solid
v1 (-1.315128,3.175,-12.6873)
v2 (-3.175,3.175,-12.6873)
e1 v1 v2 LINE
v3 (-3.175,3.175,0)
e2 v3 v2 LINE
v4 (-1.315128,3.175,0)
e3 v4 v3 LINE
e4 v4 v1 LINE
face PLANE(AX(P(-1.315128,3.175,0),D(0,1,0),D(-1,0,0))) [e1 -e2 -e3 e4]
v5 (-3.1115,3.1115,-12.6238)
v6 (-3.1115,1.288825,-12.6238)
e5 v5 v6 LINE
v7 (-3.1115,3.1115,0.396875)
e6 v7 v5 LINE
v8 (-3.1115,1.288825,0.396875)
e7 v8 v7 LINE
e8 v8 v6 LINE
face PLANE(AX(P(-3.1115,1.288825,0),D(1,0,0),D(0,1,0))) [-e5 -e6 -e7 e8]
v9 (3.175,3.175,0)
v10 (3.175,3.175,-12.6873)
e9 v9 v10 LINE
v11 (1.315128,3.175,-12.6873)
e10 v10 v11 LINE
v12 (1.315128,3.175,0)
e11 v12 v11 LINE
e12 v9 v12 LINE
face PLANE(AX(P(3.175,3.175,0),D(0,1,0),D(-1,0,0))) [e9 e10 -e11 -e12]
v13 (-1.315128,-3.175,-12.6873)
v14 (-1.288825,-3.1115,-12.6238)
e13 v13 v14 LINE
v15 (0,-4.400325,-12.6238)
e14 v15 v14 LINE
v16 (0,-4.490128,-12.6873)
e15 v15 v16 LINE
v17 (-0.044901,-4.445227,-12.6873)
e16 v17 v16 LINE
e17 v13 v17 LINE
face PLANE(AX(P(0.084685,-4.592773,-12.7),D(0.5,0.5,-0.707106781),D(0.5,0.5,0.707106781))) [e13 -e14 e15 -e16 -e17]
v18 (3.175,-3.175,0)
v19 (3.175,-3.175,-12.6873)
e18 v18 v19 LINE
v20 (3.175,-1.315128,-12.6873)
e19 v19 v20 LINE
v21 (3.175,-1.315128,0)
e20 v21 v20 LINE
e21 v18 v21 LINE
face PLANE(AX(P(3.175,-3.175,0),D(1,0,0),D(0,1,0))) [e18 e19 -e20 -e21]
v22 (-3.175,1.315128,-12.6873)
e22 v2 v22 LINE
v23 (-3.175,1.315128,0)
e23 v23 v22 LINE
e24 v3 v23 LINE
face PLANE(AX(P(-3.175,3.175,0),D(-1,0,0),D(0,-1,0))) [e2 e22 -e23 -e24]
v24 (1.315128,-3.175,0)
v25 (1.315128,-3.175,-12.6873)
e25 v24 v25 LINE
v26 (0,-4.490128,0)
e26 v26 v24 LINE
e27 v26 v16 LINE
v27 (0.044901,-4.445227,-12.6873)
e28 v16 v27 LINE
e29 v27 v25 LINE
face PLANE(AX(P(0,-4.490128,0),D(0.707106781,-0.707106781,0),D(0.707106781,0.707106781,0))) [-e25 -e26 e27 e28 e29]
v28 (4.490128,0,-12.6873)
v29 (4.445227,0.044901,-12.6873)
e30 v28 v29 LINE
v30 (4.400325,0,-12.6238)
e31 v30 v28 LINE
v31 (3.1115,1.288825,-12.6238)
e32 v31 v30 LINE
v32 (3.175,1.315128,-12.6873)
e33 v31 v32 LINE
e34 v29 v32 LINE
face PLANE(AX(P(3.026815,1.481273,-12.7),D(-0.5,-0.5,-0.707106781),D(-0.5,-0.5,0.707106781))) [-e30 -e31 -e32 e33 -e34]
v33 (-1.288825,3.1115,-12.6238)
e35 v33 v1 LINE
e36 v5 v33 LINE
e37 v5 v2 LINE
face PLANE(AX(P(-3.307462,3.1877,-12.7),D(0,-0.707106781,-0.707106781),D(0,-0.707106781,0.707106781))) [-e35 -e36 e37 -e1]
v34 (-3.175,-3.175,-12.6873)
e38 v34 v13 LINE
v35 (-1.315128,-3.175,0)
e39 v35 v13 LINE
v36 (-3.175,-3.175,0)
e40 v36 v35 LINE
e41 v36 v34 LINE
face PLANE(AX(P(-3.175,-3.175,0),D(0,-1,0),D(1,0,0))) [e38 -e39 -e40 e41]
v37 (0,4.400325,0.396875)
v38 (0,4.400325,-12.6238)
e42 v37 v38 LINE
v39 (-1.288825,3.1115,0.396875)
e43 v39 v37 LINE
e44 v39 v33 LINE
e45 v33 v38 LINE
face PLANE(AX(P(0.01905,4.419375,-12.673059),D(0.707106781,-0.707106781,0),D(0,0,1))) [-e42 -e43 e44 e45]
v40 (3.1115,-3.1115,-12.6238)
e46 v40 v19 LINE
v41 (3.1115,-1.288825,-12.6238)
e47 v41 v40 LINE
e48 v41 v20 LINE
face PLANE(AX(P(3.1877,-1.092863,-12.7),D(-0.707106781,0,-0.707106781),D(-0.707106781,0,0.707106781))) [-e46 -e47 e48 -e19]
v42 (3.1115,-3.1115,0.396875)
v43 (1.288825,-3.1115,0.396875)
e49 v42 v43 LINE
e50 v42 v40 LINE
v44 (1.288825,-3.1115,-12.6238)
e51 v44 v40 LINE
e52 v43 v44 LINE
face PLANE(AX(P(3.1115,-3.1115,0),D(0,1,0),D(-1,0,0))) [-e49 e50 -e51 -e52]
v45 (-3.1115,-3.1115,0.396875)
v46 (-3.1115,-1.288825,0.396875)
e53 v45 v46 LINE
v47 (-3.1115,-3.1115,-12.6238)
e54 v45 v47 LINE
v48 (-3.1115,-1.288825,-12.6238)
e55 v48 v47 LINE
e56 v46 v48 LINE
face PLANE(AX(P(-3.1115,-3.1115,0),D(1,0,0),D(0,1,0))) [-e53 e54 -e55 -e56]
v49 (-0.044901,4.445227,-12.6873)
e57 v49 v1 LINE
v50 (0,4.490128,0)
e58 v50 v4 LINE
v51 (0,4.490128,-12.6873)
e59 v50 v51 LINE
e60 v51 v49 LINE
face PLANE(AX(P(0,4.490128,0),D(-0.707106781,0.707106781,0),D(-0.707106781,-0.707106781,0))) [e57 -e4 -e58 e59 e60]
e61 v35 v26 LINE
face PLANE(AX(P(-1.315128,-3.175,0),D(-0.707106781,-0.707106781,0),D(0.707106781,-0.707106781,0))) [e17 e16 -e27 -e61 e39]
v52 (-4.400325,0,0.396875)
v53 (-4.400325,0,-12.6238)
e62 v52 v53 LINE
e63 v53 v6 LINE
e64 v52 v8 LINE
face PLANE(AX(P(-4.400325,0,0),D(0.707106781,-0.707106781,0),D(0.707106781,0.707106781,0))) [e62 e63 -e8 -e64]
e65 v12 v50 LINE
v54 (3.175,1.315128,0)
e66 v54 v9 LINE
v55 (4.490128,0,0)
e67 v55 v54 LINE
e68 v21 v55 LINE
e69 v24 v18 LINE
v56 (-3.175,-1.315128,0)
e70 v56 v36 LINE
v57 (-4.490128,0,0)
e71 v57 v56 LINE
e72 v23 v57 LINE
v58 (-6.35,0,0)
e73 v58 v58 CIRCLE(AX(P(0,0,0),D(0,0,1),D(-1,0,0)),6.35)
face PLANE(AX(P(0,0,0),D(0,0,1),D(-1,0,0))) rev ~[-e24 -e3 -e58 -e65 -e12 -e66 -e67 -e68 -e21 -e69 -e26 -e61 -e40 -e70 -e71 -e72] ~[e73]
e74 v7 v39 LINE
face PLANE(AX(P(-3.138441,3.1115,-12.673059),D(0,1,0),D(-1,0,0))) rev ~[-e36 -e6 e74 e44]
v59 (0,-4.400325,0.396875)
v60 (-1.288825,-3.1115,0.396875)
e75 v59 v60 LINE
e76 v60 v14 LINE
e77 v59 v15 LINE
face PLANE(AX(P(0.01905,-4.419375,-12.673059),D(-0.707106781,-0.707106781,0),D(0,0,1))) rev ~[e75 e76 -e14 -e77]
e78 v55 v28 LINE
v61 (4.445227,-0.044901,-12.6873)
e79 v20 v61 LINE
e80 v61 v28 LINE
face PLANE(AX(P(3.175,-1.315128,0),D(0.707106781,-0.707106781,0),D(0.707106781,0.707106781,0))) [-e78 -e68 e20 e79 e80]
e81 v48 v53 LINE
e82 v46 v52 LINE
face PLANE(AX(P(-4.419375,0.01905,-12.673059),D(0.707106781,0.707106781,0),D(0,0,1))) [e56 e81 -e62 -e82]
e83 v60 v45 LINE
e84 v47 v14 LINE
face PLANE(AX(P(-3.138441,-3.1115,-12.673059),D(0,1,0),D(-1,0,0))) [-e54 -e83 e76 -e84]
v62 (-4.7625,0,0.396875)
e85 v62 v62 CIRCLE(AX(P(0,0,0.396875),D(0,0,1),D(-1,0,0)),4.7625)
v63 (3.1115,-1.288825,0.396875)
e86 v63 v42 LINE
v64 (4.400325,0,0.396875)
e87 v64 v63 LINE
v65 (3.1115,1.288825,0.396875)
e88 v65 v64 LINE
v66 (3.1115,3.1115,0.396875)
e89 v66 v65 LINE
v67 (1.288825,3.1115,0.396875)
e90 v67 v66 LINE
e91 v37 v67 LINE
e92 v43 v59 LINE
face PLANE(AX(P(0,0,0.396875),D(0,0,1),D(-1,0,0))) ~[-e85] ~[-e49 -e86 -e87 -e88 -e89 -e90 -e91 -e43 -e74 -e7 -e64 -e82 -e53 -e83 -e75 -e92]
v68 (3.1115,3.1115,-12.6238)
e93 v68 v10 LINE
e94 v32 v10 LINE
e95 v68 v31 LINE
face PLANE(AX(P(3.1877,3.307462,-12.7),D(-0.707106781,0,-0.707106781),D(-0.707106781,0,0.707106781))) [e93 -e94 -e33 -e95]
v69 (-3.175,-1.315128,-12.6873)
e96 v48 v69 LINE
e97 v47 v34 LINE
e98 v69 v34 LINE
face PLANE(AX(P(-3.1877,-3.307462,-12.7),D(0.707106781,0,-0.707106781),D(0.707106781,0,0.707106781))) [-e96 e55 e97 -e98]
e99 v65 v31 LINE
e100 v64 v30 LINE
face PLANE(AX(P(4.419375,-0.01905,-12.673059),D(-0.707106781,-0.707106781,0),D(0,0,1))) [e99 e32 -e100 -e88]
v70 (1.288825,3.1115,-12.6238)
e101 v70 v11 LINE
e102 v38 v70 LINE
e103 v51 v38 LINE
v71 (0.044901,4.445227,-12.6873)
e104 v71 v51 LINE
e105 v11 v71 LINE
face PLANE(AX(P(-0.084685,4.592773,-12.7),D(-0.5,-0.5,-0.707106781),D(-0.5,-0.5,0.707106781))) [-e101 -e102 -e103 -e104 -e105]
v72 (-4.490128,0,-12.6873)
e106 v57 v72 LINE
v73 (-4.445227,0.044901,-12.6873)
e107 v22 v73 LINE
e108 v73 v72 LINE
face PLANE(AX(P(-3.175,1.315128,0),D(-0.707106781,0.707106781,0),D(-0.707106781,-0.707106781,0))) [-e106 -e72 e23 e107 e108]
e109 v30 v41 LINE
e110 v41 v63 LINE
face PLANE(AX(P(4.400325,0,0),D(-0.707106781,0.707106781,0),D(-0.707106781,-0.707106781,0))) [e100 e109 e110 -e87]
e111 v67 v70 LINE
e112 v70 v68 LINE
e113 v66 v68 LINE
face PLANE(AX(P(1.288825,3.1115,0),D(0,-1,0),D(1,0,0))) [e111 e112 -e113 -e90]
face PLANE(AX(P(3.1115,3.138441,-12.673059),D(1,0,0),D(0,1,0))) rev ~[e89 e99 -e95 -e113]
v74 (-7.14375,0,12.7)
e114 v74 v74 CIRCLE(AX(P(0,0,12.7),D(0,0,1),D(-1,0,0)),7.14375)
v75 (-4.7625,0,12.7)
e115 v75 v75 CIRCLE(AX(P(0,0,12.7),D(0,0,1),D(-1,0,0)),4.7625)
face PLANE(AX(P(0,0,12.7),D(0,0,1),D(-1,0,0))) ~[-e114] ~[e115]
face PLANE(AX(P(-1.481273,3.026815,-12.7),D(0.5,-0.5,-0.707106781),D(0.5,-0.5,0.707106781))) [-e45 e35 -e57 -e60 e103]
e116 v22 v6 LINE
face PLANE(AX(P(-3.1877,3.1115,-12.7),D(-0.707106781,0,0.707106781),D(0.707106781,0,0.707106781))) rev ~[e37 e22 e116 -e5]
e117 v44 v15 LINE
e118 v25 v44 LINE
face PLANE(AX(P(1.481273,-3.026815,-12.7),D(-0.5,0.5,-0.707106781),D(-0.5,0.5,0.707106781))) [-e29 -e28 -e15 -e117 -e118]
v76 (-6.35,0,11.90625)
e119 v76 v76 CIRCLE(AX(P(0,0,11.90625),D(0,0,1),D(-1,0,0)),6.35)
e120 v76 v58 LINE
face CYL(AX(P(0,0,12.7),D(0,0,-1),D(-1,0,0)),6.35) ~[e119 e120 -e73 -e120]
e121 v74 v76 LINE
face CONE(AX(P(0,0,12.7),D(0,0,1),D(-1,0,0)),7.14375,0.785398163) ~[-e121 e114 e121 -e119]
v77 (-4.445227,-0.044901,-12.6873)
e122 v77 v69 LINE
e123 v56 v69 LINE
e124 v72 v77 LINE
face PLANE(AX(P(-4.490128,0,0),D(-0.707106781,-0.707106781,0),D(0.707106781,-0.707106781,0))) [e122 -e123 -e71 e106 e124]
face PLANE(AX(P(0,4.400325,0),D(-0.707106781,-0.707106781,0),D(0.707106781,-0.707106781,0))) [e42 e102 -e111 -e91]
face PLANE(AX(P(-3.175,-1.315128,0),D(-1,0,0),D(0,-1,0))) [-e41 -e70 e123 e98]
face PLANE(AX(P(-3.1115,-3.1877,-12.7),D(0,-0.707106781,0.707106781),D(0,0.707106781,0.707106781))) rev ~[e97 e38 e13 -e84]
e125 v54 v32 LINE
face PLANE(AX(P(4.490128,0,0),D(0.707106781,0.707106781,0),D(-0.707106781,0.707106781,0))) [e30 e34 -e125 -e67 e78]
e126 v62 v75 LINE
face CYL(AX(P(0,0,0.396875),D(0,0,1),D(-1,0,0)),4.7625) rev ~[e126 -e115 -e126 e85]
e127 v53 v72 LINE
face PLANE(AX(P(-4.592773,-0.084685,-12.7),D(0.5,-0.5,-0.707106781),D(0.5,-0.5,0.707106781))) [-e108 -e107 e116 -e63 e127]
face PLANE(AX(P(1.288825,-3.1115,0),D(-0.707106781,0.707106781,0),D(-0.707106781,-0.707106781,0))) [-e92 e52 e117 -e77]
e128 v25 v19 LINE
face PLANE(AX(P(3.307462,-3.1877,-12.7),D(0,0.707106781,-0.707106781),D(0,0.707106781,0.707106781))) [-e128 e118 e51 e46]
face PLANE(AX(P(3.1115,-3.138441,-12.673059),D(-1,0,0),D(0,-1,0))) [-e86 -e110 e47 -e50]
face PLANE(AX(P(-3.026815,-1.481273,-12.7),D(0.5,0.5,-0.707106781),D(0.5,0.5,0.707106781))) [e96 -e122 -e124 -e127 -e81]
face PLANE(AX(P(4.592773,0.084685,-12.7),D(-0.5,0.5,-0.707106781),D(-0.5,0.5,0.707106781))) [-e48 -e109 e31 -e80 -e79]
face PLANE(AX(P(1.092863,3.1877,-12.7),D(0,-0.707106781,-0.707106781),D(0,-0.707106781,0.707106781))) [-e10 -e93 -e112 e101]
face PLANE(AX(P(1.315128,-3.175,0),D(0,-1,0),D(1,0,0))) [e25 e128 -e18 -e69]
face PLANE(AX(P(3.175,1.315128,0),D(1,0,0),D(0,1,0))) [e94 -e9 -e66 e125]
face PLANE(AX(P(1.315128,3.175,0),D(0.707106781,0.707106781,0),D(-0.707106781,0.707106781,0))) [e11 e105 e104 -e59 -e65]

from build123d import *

# Parameters (mm, degrees)
F1_DEPTH      = 12.7
F4_DEPTH      = 25.4
F5_T1_DEPTH   = 2.0186367444
F5_T3_DEPTH   = 2.0186367444
F5_T5_DEPTH   = 2.0186367444
F5_T7_DEPTH   = 2.0186367444
F5_T9_DEPTH   = 2.0186367444
F5_T11_DEPTH  = 2.0186367444
F5_T13_DEPTH  = 2.0186367444
F5_T15_DEPTH  = 2.0186367444
F5_T17_DEPTH  = 2.0186367444
F5_T19_DEPTH  = 2.0186367444
F5_T21_DEPTH  = 2.0186367444
F5_T23_DEPTH  = 2.0186367444
F5_T29_DEPTH  = 2.214598988
F5_T35_DEPTH  = 2.214598988
F5_T44_DEPTH  = 2.214598988
F5_T50_DEPTH  = 2.214598988
F5_T59_DEPTH  = 2.214598988
F5_T65_DEPTH  = 2.214598988
F5_T74_DEPTH  = 2.214598988
F5_T80_DEPTH  = 2.214598988
F5_T89_DEPTH  = 2.214598988
F5_T95_DEPTH  = 2.214598988
F5_T104_DEPTH = 2.214598988
F5_T110_DEPTH = 2.214598988
F5_T119_DEPTH = 2.214598988
F5_T125_DEPTH = 2.214598988
F5_T134_DEPTH = 2.214598988
F5_T140_DEPTH = 2.214598988


# Not quite as in the source:
# - a fillet or chamfer that OpenCascade refuses, or shapes differently, is made with other operations: its cross-section is extruded or revolved along the edge and cut away or added


with BuildPart() as f1:
    # F0 (on Top) → F1 (new body)
    with BuildSketch(Plane.XY):
        Polygon((1.3151280605, -3.175), (3.175, -3.175), (3.175, -1.3151280605), (4.4901280605, 0), (3.175, 1.3151280605), (3.175, 3.175), (1.3151280605, 3.175), (0, 4.4901280605), (-1.3151280605, 3.175), (-3.175, 3.175), (-3.175, 1.3151280605), (-4.4901280605, 0), (-3.175, -1.3151280605), (-3.175, -3.175), (-1.3151280605, -3.175), (0, -4.4901280605), align=None)
        Polygon((3.1115, -1.2888254993), (3.1115, -3.1115), (1.2888254993, -3.1115), (0, -4.4003254993), (-1.2888254993, -3.1115), (-3.1115, -3.1115), (-3.1115, -1.2888254993), (-4.4003254993, 0), (-3.1115, 1.2888254993), (-3.1115, 3.1115), (-1.2888254993, 3.1115), (0, 4.4003254993), (1.2888254993, 3.1115), (3.1115, 3.1115), (3.1115, 1.2888254993), (4.4003254993, 0), align=None, mode=Mode.SUBTRACT)
    extrude(amount=-F1_DEPTH)

    # F2 (on Front) → F3 (revolve)
    with BuildSketch(Plane.XZ):
        Polygon((-6.35, 0), (0, 0), (0, 0.396875), (-4.7625, 0.396875), (-4.7625, 12.7), (-6.35, 12.7), (-6.35, 11.90625), align=None)
        Polygon((-7.14375, 12.7), (-6.35, 11.90625), (-6.35, 12.7), align=None)
    revolve(axis=Axis((0, 0, 0.1984375), (0, 0, 1)))

    # F4 (cut): a face of the model
    f4_faces = [f1.faces().sort_by_distance(p)[0] for p in [
        (0, 0, 0),
    ]]
    extrude(f4_faces, amount=-F4_DEPTH, mode=Mode.SUBTRACT)

    # F5: chamfer of 0.0762 on 16 edges, made by hand

    # F5_s2 → F5_t1 (cut)
    with BuildSketch(Plane(origin=(-0.772771019, -0.772771019, 0), x_dir=(0, 0, 1), z_dir=(-0.7071067812, -0.7071067812, 0))):
        Polygon((-12.7, -3.1877), (-12.6238, -3.1115), (-12.7, -3.1115), align=None)
    extrude(amount=F5_T1_DEPTH, mode=Mode.SUBTRACT)

    # F5_s4 → F5_t3 (cut)
    with BuildSketch(Plane.YZ.offset(1.0928632556)):
        Polygon((-3.1877, -12.7), (-3.1115, -12.6238), (-3.1115, -12.7), align=None)
        Polygon((3.1877, -12.7), (3.1115, -12.6238), (3.1115, -12.7), align=None)
    extrude(amount=F5_T3_DEPTH, mode=Mode.SUBTRACT)

    # F5_s6 → F5_t5 (cut)
    with BuildSketch(Plane.XZ.offset(1.0928632556)):
        Polygon((3.1877, -12.7), (3.1115, -12.6238), (3.1115, -12.7), align=None)
        Polygon((-3.1877, -12.7), (-3.1115, -12.6238), (-3.1115, -12.7), align=None)
    extrude(amount=F5_T5_DEPTH, mode=Mode.SUBTRACT)

    # F5_s8 → F5_t7 (cut)
    with BuildSketch(Plane(origin=(2.2001627497, 2.2001627497, 0), x_dir=(0, 0, 1), z_dir=(-0.7071067812, -0.7071067812, 0))):
        Polygon((-12.7, -3.1877), (-12.6238, -3.1115), (-12.7, -3.1115), align=None)
    extrude(amount=F5_T7_DEPTH, mode=Mode.SUBTRACT)

    # F5_s10 → F5_t9 (cut)
    with BuildSketch(Plane(origin=(0.772771019, -0.772771019, 0), x_dir=(0, 0, 1), z_dir=(0.7071067812, -0.7071067812, 0))):
        Polygon((-12.7, -3.1877), (-12.6238, -3.1115), (-12.7, -3.1115), align=None)
    extrude(amount=F5_T9_DEPTH, mode=Mode.SUBTRACT)

    # F5_s12 → F5_t11 (cut)
    with BuildSketch(Plane.XZ.offset(-3.1115)):
        Polygon((3.1877, -12.7), (3.1115, -12.6238), (3.1115, -12.7), align=None)
        Polygon((-3.1877, -12.7), (-3.1115, -12.6238), (-3.1115, -12.7), align=None)
    extrude(amount=F5_T11_DEPTH, mode=Mode.SUBTRACT)

    # F5_s14 → F5_t13 (cut)
    with BuildSketch(Plane(origin=(-2.2001627497, 2.2001627497, 0), x_dir=(0, 0, 1), z_dir=(0.7071067812, -0.7071067812, 0))):
        Polygon((-12.7, -3.1877), (-12.6238, -3.1115), (-12.7, -3.1115), align=None)
    extrude(amount=F5_T13_DEPTH, mode=Mode.SUBTRACT)

    # F5_s16 → F5_t15 (cut)
    with BuildSketch(Plane(origin=(0.772771019, 0.772771019, 0), x_dir=(0, 0, 1), z_dir=(0.7071067812, 0.7071067812, 0))):
        Polygon((-12.7, -3.1877), (-12.6238, -3.1115), (-12.7, -3.1115), align=None)
    extrude(amount=F5_T15_DEPTH, mode=Mode.SUBTRACT)

    # F5_s18 → F5_t17 (cut)
    with BuildSketch(Plane.YZ.offset(-3.1115)):
        Polygon((3.1877, -12.7), (3.1115, -12.6238), (3.1115, -12.7), align=None)
        Polygon((-3.1877, -12.7), (-3.1115, -12.6238), (-3.1115, -12.7), align=None)
    extrude(amount=F5_T17_DEPTH, mode=Mode.SUBTRACT)

    # F5_s20 → F5_t19 (cut)
    with BuildSketch(Plane(origin=(-2.2001627497, -2.2001627497, 0), x_dir=(0, 0, 1), z_dir=(0.7071067812, 0.7071067812, 0))):
        Polygon((-12.7, -3.1877), (-12.6238, -3.1115), (-12.7, -3.1115), align=None)
    extrude(amount=F5_T19_DEPTH, mode=Mode.SUBTRACT)

    # F5_s22 → F5_t21 (cut)
    with BuildSketch(Plane(origin=(-0.772771019, 0.772771019, 0), x_dir=(0, 0, 1), z_dir=(-0.7071067812, 0.7071067812, 0))):
        Polygon((-12.7, -3.1877), (-12.6238, -3.1115), (-12.7, -3.1115), align=None)
    extrude(amount=F5_T21_DEPTH, mode=Mode.SUBTRACT)

    # F5_s24 → F5_t23 (cut)
    with BuildSketch(Plane(origin=(2.2001627497, -2.2001627497, 0), x_dir=(0, 0, 1), z_dir=(-0.7071067812, 0.7071067812, 0))):
        Polygon((-12.7, -3.1877), (-12.6238, -3.1115), (-12.7, -3.1115), align=None)
    extrude(amount=F5_T23_DEPTH, mode=Mode.SUBTRACT)


with BuildPart() as f5_tool27:
    # F5_s28 → F5_t29 (new body)
    with BuildSketch(Plane(origin=(-0.772771019, -0.772771019, 0), x_dir=(0, 0, 1), z_dir=(-0.7071067812, -0.7071067812, 0))):
        Polygon((-12.7, -3.1877), (-12.6238, -3.1115), (-12.7, -3.1115), align=None)
    extrude(amount=F5_T29_DEPTH)

    split(bisect_by=Plane(origin=(2.2450640303, -2.2450640303, 0), x_dir=(0, 0, 1), z_dir=(-0.7071067812, 0.7071067812, 0)), keep=Keep.TOP)

    split(bisect_by=Plane(origin=(-2.2001627497, -2.2001627497, 0), x_dir=(0, 0, 1), z_dir=(-0.7071067812, -0.7071067812, 0)), keep=Keep.TOP)

    split(bisect_by=Plane(origin=(-2.2450640303, -2.2450640303, 0), x_dir=(0, 0, 1), z_dir=(0.7071067812, 0.7071067812, 0)), keep=Keep.TOP)


with BuildPart() as f5_tool33:
    # F5_s34 → F5_t35 (new body)
    with BuildSketch(Plane(origin=(2.338728981, -2.338728981, 0), x_dir=(0, 0, 1), z_dir=(-0.7071067812, 0.7071067812, 0))):
        Polygon((-12.7, -3.1877), (-12.6238, -3.1115), (-12.7, -3.1115), align=None)
    extrude(amount=F5_T35_DEPTH)

    split(bisect_by=Plane(origin=(2.2450640303, -2.2450640303, 0), x_dir=(0, 0, 1), z_dir=(-0.7071067812, 0.7071067812, 0)), keep=Keep.TOP)

    split(bisect_by=Plane(origin=(2.2001627497, -2.2001627497, 0), x_dir=(0, 0, 1), z_dir=(0.7071067812, -0.7071067812, 0)), keep=Keep.TOP)

    split(bisect_by=Plane(origin=(-2.2450640303, -2.2450640303, 0), x_dir=(0, 0, 1), z_dir=(0.7071067812, 0.7071067812, 0)), keep=Keep.TOP)


with BuildPart() as f5_tool27_1:
    add(f5_tool27.part)

    # F5_t39: intersect F5_tool33
    add(f5_tool33.part, mode=Mode.INTERSECT)


with BuildPart() as f1_1:
    add(f1.part)

    # F5_t25: cut F5_tool27
    add(f5_tool27_1.part, mode=Mode.SUBTRACT)


with BuildPart() as f5_tool42:
    # F5_s43 → F5_t44 (new body)
    with BuildSketch(Plane.XZ.offset(1.0928632556)):
        Polygon((3.1877, -12.7), (3.1115, -12.6238), (3.1115, -12.7), align=None)
    extrude(amount=F5_T44_DEPTH)

    split(bisect_by=Plane.XZ.offset(3.1115), keep=Keep.TOP)

    split(bisect_by=Plane.YZ.offset(3.175), keep=Keep.BOTTOM)

    split(bisect_by=Plane.XZ.offset(3.175), keep=Keep.BOTTOM)


with BuildPart() as f5_tool48:
    # F5_s49 → F5_t50 (new body)
    with BuildSketch(Plane.YZ.offset(3.3074622437)):
        Polygon((-3.1877, -12.7), (-3.1115, -12.6238), (-3.1115, -12.7), align=None)
    extrude(amount=-F5_T50_DEPTH)

    split(bisect_by=Plane.YZ.offset(3.1115), keep=Keep.TOP)

    split(bisect_by=Plane.YZ.offset(3.175), keep=Keep.BOTTOM)

    split(bisect_by=Plane.XZ.offset(3.175), keep=Keep.BOTTOM)


with BuildPart() as f5_tool42_1:
    add(f5_tool42.part)

    # F5_t54: intersect F5_tool48
    add(f5_tool48.part, mode=Mode.INTERSECT)


with BuildPart() as f1_2:
    add(f1_1.part)

    # F5_t40: cut F5_tool42
    add(f5_tool42_1.part, mode=Mode.SUBTRACT)


with BuildPart() as f5_tool57:
    # F5_s58 → F5_t59 (new body)
    with BuildSketch(Plane(origin=(0.772771019, -0.772771019, 0), x_dir=(0, 0, 1), z_dir=(0.7071067812, -0.7071067812, 0))):
        Polygon((-12.7, -3.1877), (-12.6238, -3.1115), (-12.7, -3.1115), align=None)
    extrude(amount=F5_T59_DEPTH)

    split(bisect_by=Plane(origin=(2.2001627497, -2.2001627497, 0), x_dir=(0, 0, 1), z_dir=(0.7071067812, -0.7071067812, 0)), keep=Keep.TOP)

    split(bisect_by=Plane(origin=(2.2450640303, 2.2450640303, 0), x_dir=(0, 0, 1), z_dir=(-0.7071067812, -0.7071067812, 0)), keep=Keep.TOP)

    split(bisect_by=Plane(origin=(2.2450640303, -2.2450640303, 0), x_dir=(0, 0, 1), z_dir=(-0.7071067812, 0.7071067812, 0)), keep=Keep.TOP)


with BuildPart() as f5_tool63:
    # F5_s64 → F5_t65 (new body)
    with BuildSketch(Plane(origin=(2.338728981, 2.338728981, 0), x_dir=(0, 0, 1), z_dir=(-0.7071067812, -0.7071067812, 0))):
        Polygon((-12.7, -3.1877), (-12.6238, -3.1115), (-12.7, -3.1115), align=None)
    extrude(amount=F5_T65_DEPTH)

    split(bisect_by=Plane(origin=(2.2001627497, 2.2001627497, 0), x_dir=(0, 0, 1), z_dir=(0.7071067812, 0.7071067812, 0)), keep=Keep.TOP)

    split(bisect_by=Plane(origin=(2.2450640303, 2.2450640303, 0), x_dir=(0, 0, 1), z_dir=(-0.7071067812, -0.7071067812, 0)), keep=Keep.TOP)

    split(bisect_by=Plane(origin=(2.2450640303, -2.2450640303, 0), x_dir=(0, 0, 1), z_dir=(-0.7071067812, 0.7071067812, 0)), keep=Keep.TOP)


with BuildPart() as f5_tool57_1:
    add(f5_tool57.part)

    # F5_t69: intersect F5_tool63
    add(f5_tool63.part, mode=Mode.INTERSECT)


with BuildPart() as f1_3:
    add(f1_2.part)

    # F5_t55: cut F5_tool57
    add(f5_tool57_1.part, mode=Mode.SUBTRACT)


with BuildPart() as f5_tool72:
    # F5_s73 → F5_t74 (new body)
    with BuildSketch(Plane.YZ.offset(1.0928632556)):
        Polygon((3.1877, -12.7), (3.1115, -12.6238), (3.1115, -12.7), align=None)
    extrude(amount=F5_T74_DEPTH)

    split(bisect_by=Plane.YZ.offset(3.1115), keep=Keep.TOP)

    split(bisect_by=Plane.XZ.offset(-3.175), keep=Keep.TOP)

    split(bisect_by=Plane.YZ.offset(3.175), keep=Keep.BOTTOM)


with BuildPart() as f5_tool78:
    # F5_s79 → F5_t80 (new body)
    with BuildSketch(Plane.XZ.offset(-3.3074622437)):
        Polygon((3.1877, -12.7), (3.1115, -12.6238), (3.1115, -12.7), align=None)
    extrude(amount=F5_T80_DEPTH)

    split(bisect_by=Plane.XZ.offset(-3.1115), keep=Keep.BOTTOM)

    split(bisect_by=Plane.XZ.offset(-3.175), keep=Keep.TOP)

    split(bisect_by=Plane.YZ.offset(3.175), keep=Keep.BOTTOM)


with BuildPart() as f5_tool72_1:
    add(f5_tool72.part)

    # F5_t84: intersect F5_tool78
    add(f5_tool78.part, mode=Mode.INTERSECT)


with BuildPart() as f1_4:
    add(f1_3.part)

    # F5_t70: cut F5_tool72
    add(f5_tool72_1.part, mode=Mode.SUBTRACT)


with BuildPart() as f5_tool87:
    # F5_s88 → F5_t89 (new body)
    with BuildSketch(Plane(origin=(-2.338728981, 2.338728981, 0), x_dir=(0, 0, 1), z_dir=(0.7071067812, -0.7071067812, 0))):
        Polygon((-12.7, -3.1877), (-12.6238, -3.1115), (-12.7, -3.1115), align=None)
    extrude(amount=F5_T89_DEPTH)

    split(bisect_by=Plane(origin=(-2.2001627497, 2.2001627497, 0), x_dir=(0, 0, 1), z_dir=(-0.7071067812, 0.7071067812, 0)), keep=Keep.TOP)

    split(bisect_by=Plane(origin=(-2.2450640303, 2.2450640303, 0), x_dir=(0, 0, 1), z_dir=(0.7071067812, -0.7071067812, 0)), keep=Keep.TOP)

    split(bisect_by=Plane(origin=(2.2450640303, 2.2450640303, 0), x_dir=(0, 0, 1), z_dir=(-0.7071067812, -0.7071067812, 0)), keep=Keep.TOP)


with BuildPart() as f5_tool93:
    # F5_s94 → F5_t95 (new body)
    with BuildSketch(Plane(origin=(0.772771019, 0.772771019, 0), x_dir=(0, 0, 1), z_dir=(0.7071067812, 0.7071067812, 0))):
        Polygon((-12.7, -3.1877), (-12.6238, -3.1115), (-12.7, -3.1115), align=None)
    extrude(amount=F5_T95_DEPTH)

    split(bisect_by=Plane(origin=(2.2001627497, 2.2001627497, 0), x_dir=(0, 0, 1), z_dir=(0.7071067812, 0.7071067812, 0)), keep=Keep.TOP)

    split(bisect_by=Plane(origin=(-2.2450640303, 2.2450640303, 0), x_dir=(0, 0, 1), z_dir=(0.7071067812, -0.7071067812, 0)), keep=Keep.TOP)

    split(bisect_by=Plane(origin=(2.2450640303, 2.2450640303, 0), x_dir=(0, 0, 1), z_dir=(-0.7071067812, -0.7071067812, 0)), keep=Keep.TOP)


with BuildPart() as f5_tool87_1:
    add(f5_tool87.part)

    # F5_t99: intersect F5_tool93
    add(f5_tool93.part, mode=Mode.INTERSECT)


with BuildPart() as f1_5:
    add(f1_4.part)

    # F5_t85: cut F5_tool87
    add(f5_tool87_1.part, mode=Mode.SUBTRACT)


with BuildPart() as f5_tool102:
    # F5_s103 → F5_t104 (new body)
    with BuildSketch(Plane.XZ.offset(-1.0928632556)):
        Polygon((-3.1877, -12.7), (-3.1115, -12.6238), (-3.1115, -12.7), align=None)
    extrude(amount=-F5_T104_DEPTH)

    split(bisect_by=Plane.XZ.offset(-3.1115), keep=Keep.BOTTOM)

    split(bisect_by=Plane.YZ.offset(-3.175), keep=Keep.TOP)

    split(bisect_by=Plane.XZ.offset(-3.175), keep=Keep.TOP)


with BuildPart() as f5_tool108:
    # F5_s109 → F5_t110 (new body)
    with BuildSketch(Plane.YZ.offset(-3.3074622437)):
        Polygon((3.1877, -12.7), (3.1115, -12.6238), (3.1115, -12.7), align=None)
    extrude(amount=F5_T110_DEPTH)

    split(bisect_by=Plane.YZ.offset(-3.1115), keep=Keep.BOTTOM)

    split(bisect_by=Plane.YZ.offset(-3.175), keep=Keep.TOP)

    split(bisect_by=Plane.XZ.offset(-3.175), keep=Keep.TOP)


with BuildPart() as f5_tool102_1:
    add(f5_tool102.part)

    # F5_t114: intersect F5_tool108
    add(f5_tool108.part, mode=Mode.INTERSECT)


with BuildPart() as f1_6:
    add(f1_5.part)

    # F5_t100: cut F5_tool102
    add(f5_tool102_1.part, mode=Mode.SUBTRACT)


with BuildPart() as f5_tool117:
    # F5_s118 → F5_t119 (new body)
    with BuildSketch(Plane(origin=(-0.772771019, 0.772771019, 0), x_dir=(0, 0, 1), z_dir=(-0.7071067812, 0.7071067812, 0))):
        Polygon((-12.7, -3.1877), (-12.6238, -3.1115), (-12.7, -3.1115), align=None)
    extrude(amount=F5_T119_DEPTH)

    split(bisect_by=Plane(origin=(-2.2001627497, 2.2001627497, 0), x_dir=(0, 0, 1), z_dir=(-0.7071067812, 0.7071067812, 0)), keep=Keep.TOP)

    split(bisect_by=Plane(origin=(-2.2450640303, -2.2450640303, 0), x_dir=(0, 0, 1), z_dir=(0.7071067812, 0.7071067812, 0)), keep=Keep.TOP)

    split(bisect_by=Plane(origin=(-2.2450640303, 2.2450640303, 0), x_dir=(0, 0, 1), z_dir=(0.7071067812, -0.7071067812, 0)), keep=Keep.TOP)


with BuildPart() as f5_tool123:
    # F5_s124 → F5_t125 (new body)
    with BuildSketch(Plane(origin=(-2.338728981, -2.338728981, 0), x_dir=(0, 0, 1), z_dir=(0.7071067812, 0.7071067812, 0))):
        Polygon((-12.7, -3.1877), (-12.6238, -3.1115), (-12.7, -3.1115), align=None)
    extrude(amount=F5_T125_DEPTH)

    split(bisect_by=Plane(origin=(-2.2001627497, -2.2001627497, 0), x_dir=(0, 0, 1), z_dir=(-0.7071067812, -0.7071067812, 0)), keep=Keep.TOP)

    split(bisect_by=Plane(origin=(-2.2450640303, -2.2450640303, 0), x_dir=(0, 0, 1), z_dir=(0.7071067812, 0.7071067812, 0)), keep=Keep.TOP)

    split(bisect_by=Plane(origin=(-2.2450640303, 2.2450640303, 0), x_dir=(0, 0, 1), z_dir=(0.7071067812, -0.7071067812, 0)), keep=Keep.TOP)


with BuildPart() as f5_tool117_1:
    add(f5_tool117.part)

    # F5_t129: intersect F5_tool123
    add(f5_tool123.part, mode=Mode.INTERSECT)


with BuildPart() as f1_7:
    add(f1_6.part)

    # F5_t115: cut F5_tool117
    add(f5_tool117_1.part, mode=Mode.SUBTRACT)


with BuildPart() as f5_tool132:
    # F5_s133 → F5_t134 (new body)
    with BuildSketch(Plane.YZ.offset(-1.0928632556)):
        Polygon((-3.1877, -12.7), (-3.1115, -12.6238), (-3.1115, -12.7), align=None)
    extrude(amount=-F5_T134_DEPTH)

    split(bisect_by=Plane.YZ.offset(-3.1115), keep=Keep.BOTTOM)

    split(bisect_by=Plane.XZ.offset(3.175), keep=Keep.BOTTOM)

    split(bisect_by=Plane.YZ.offset(-3.175), keep=Keep.TOP)


with BuildPart() as f5_tool138:
    # F5_s139 → F5_t140 (new body)
    with BuildSketch(Plane.XZ.offset(3.3074622437)):
        Polygon((-3.1877, -12.7), (-3.1115, -12.6238), (-3.1115, -12.7), align=None)
    extrude(amount=-F5_T140_DEPTH)

    split(bisect_by=Plane.XZ.offset(3.1115), keep=Keep.TOP)

    split(bisect_by=Plane.XZ.offset(3.175), keep=Keep.BOTTOM)

    split(bisect_by=Plane.YZ.offset(-3.175), keep=Keep.TOP)


with BuildPart() as f5_tool132_1:
    add(f5_tool132.part)

    # F5_t144: intersect F5_tool138
    add(f5_tool138.part, mode=Mode.INTERSECT)


with BuildPart() as f1_8:
    add(f1_7.part)

    # F5_t130: cut F5_tool132
    add(f5_tool132_1.part, mode=Mode.SUBTRACT)


solid = f1_8.part
